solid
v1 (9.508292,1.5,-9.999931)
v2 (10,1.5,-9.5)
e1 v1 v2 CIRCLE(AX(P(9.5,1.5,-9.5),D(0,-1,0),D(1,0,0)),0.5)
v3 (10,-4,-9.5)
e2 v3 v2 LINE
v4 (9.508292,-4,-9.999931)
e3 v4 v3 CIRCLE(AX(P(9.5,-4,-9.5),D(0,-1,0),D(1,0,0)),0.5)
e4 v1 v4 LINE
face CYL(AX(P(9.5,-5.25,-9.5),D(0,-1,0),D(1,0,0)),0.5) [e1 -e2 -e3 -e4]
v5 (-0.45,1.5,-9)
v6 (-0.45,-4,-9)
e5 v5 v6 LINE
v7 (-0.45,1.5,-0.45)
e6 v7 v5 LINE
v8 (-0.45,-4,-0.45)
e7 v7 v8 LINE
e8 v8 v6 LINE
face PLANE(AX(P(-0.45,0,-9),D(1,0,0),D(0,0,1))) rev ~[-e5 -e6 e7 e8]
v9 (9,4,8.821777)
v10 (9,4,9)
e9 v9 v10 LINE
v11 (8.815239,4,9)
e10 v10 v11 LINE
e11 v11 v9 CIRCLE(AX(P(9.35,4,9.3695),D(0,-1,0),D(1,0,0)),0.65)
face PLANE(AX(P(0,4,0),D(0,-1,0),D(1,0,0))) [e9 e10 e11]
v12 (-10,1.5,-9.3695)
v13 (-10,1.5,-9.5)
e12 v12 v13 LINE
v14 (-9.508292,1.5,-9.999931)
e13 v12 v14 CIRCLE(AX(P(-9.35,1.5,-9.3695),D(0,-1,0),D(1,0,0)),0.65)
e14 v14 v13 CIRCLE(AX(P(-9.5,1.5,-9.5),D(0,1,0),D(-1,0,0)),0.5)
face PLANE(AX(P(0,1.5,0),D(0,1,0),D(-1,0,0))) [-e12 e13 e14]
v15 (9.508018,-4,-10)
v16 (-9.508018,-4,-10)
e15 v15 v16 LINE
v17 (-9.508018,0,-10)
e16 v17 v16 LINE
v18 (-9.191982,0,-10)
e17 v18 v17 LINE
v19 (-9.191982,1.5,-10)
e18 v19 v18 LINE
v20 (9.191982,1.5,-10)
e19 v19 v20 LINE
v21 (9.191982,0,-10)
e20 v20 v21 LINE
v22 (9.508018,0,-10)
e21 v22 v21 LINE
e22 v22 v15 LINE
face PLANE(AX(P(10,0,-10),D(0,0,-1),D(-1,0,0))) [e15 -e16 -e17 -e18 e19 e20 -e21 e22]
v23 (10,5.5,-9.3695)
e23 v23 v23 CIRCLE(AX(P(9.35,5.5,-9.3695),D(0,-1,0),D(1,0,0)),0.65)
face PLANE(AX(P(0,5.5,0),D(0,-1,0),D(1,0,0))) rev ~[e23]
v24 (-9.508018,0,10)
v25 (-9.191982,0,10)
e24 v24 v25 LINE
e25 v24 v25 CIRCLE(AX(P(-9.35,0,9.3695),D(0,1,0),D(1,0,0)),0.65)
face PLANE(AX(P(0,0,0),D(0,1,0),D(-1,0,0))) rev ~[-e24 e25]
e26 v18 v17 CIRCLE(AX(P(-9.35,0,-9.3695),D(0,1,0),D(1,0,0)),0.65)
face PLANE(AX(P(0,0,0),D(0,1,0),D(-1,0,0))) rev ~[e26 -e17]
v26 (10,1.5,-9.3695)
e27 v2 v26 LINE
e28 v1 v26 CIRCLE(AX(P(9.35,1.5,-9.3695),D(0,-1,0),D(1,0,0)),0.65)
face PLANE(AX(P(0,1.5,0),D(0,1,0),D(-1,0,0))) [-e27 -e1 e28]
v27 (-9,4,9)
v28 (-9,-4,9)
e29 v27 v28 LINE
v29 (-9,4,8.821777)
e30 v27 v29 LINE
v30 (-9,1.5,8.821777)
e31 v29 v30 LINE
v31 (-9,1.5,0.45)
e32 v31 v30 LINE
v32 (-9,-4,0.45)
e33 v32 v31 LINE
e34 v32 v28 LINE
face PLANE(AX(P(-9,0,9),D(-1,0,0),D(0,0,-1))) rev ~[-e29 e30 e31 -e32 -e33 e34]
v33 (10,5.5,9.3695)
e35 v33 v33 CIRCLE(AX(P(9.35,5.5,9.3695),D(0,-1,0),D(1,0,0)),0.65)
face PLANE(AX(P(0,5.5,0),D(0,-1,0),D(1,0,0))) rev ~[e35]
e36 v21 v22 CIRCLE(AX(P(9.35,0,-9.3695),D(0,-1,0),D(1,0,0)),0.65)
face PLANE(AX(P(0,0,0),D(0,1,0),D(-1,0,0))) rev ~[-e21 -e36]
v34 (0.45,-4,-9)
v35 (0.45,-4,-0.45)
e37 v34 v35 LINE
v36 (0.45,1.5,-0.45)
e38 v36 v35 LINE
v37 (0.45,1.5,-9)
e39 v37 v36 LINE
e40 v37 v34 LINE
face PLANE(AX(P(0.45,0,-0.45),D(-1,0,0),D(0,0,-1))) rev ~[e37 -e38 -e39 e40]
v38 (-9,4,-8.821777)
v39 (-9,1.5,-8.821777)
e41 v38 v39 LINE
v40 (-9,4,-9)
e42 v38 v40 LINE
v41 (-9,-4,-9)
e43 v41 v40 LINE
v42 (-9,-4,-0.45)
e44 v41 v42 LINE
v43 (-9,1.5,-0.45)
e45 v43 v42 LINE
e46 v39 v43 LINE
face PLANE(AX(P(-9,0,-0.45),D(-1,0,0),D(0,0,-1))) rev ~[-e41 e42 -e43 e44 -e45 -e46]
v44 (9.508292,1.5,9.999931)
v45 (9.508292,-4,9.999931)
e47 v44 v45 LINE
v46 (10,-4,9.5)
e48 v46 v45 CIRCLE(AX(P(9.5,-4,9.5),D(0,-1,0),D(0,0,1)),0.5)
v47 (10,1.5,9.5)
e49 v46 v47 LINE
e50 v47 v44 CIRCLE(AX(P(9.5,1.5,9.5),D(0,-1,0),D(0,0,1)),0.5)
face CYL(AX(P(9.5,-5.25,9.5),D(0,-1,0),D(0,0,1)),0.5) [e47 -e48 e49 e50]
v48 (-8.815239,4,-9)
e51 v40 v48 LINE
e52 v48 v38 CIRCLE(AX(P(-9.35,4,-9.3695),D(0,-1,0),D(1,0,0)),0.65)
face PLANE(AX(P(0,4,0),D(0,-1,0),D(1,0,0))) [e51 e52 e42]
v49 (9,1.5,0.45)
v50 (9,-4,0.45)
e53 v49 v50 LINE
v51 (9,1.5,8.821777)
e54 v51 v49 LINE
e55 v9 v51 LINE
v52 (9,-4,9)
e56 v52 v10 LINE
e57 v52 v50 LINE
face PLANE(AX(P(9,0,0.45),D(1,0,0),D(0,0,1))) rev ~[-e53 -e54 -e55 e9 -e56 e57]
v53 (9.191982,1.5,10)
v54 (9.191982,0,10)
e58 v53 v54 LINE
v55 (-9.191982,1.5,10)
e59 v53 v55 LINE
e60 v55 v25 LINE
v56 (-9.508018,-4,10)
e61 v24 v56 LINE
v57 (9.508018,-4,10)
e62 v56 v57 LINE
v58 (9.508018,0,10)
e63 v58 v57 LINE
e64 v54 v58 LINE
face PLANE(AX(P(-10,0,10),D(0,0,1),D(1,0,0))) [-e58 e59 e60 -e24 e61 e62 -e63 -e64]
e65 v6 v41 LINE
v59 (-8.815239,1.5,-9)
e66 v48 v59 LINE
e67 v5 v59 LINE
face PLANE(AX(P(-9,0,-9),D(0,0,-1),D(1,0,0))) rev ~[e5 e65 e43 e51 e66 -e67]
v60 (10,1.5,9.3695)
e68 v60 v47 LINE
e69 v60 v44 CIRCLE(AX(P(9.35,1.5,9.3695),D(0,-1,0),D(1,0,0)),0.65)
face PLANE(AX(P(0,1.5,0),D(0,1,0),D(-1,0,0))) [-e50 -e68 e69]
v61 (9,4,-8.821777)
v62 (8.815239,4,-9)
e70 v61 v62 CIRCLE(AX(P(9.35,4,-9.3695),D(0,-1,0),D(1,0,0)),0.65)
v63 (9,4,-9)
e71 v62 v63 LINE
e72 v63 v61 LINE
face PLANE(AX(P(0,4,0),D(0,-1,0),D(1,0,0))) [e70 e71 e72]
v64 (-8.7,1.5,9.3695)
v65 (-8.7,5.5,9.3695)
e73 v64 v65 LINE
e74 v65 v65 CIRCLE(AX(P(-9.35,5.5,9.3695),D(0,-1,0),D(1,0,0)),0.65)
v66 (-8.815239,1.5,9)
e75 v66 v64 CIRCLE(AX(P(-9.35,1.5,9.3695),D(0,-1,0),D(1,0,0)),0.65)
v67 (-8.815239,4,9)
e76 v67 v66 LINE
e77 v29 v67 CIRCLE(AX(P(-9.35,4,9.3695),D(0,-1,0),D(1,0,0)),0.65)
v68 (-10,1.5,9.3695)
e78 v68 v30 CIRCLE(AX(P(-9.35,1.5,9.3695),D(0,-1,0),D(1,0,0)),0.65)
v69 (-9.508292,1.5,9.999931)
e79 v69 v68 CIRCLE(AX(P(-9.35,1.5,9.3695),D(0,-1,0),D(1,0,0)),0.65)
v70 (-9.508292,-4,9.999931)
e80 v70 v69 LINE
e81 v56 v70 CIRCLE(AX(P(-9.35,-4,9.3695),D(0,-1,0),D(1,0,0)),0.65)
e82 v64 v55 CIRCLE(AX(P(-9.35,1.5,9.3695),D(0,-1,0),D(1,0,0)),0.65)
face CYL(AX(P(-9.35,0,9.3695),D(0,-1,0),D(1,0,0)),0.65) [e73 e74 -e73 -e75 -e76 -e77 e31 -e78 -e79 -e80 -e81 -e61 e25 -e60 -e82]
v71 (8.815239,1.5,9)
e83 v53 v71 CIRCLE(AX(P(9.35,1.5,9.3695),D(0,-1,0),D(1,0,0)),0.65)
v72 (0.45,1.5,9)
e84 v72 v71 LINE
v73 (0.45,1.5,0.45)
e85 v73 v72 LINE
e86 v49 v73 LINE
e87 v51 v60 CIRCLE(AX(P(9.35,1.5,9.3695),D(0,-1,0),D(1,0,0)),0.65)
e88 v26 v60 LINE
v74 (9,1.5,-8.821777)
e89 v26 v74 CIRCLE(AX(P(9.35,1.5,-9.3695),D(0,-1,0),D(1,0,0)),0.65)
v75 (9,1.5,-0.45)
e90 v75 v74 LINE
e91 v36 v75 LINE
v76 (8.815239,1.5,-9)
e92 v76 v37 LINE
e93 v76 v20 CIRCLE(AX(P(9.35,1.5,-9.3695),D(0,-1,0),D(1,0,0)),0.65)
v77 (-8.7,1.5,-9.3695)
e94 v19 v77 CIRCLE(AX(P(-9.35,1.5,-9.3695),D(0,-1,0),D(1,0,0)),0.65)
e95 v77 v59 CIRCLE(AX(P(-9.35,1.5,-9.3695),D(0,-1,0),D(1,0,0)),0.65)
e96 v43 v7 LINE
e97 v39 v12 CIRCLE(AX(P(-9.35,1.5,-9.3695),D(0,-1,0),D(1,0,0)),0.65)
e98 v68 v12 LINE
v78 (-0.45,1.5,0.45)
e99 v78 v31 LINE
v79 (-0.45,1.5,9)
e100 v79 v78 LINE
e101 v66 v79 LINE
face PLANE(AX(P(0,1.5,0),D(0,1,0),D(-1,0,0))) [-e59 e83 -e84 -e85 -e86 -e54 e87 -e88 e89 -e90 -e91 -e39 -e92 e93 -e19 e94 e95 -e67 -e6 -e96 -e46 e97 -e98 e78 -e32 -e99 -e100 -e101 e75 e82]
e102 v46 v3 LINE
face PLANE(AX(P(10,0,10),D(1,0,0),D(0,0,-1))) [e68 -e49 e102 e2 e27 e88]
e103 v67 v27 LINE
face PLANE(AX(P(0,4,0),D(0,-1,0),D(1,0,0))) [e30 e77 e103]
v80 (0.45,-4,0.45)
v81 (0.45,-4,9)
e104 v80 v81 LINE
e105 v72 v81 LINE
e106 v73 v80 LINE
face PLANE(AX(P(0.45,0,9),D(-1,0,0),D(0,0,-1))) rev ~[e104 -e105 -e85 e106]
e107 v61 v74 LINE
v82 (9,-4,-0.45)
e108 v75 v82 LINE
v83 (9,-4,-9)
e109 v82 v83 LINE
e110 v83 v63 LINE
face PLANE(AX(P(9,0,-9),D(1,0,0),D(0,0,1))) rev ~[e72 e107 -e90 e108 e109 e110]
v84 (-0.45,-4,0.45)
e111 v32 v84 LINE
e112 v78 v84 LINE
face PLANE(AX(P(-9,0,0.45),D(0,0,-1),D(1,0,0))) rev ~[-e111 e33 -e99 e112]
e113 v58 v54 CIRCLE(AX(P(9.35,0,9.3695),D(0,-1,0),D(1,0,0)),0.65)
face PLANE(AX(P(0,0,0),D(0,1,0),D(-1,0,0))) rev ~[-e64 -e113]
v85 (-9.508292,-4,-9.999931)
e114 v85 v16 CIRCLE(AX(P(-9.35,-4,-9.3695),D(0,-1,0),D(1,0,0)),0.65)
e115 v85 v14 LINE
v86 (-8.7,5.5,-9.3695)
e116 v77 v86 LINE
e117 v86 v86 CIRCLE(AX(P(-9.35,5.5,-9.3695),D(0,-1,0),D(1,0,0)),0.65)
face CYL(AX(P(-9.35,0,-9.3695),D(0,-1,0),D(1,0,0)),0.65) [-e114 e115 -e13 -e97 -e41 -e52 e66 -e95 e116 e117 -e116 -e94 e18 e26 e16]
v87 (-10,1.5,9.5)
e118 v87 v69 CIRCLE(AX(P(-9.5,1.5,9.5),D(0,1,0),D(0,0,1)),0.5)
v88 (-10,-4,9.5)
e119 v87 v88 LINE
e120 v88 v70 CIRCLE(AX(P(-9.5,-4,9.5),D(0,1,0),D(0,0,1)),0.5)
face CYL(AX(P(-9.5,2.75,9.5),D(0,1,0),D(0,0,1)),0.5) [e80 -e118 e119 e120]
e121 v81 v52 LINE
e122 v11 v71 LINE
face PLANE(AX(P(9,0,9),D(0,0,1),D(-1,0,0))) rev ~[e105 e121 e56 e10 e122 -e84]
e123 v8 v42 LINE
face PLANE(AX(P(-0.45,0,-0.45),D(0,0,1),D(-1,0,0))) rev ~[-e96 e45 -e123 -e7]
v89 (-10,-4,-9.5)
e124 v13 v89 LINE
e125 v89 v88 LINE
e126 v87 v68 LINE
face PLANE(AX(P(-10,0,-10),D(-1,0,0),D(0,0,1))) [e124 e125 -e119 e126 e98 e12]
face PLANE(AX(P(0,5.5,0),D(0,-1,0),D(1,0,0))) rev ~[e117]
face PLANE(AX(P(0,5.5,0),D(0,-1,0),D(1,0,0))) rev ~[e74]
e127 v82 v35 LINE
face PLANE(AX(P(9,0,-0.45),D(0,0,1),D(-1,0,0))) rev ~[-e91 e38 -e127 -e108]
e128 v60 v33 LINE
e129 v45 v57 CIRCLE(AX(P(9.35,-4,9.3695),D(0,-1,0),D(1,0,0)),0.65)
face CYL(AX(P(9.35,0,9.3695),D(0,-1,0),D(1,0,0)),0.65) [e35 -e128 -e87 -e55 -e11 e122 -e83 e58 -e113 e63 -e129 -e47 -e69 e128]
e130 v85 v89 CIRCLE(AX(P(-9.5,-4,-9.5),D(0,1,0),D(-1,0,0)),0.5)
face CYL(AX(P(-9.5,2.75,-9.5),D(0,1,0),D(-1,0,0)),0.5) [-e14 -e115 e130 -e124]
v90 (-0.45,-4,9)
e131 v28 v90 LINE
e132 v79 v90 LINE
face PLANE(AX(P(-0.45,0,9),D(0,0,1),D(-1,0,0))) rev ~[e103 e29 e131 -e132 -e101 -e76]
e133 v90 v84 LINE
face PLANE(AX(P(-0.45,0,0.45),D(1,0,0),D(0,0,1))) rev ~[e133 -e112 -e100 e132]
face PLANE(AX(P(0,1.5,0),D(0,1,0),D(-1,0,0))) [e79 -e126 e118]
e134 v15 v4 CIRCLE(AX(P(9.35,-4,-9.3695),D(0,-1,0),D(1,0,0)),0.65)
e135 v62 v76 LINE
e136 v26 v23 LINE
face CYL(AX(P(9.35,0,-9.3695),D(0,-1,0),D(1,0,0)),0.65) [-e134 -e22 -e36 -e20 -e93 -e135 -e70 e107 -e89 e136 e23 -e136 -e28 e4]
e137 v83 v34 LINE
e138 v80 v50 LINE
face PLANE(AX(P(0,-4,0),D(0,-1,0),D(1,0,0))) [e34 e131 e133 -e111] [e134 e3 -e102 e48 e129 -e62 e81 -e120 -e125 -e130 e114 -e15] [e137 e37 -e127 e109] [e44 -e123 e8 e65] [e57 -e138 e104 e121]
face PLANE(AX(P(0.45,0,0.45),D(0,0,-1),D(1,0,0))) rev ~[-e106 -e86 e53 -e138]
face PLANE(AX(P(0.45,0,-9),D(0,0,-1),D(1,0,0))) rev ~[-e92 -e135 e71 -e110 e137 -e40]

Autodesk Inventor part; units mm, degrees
ref_plane "YZ Plane" through (0, 0, 0) normal (1, 0, 0) x (0, 1, 0)
ref_plane "XZ Plane" through (0, 0, 0) normal (0, 1, 0) x (-1, 0, 0)
ref_plane "XY Plane" through (0, 0, 0) normal (0, 0, 1) x (1, 0, 0)
sketch "Sketch1" plane through (0, 0, 0) normal (0, 1, 0) x (-1, 0, 0)
  line L0 (-9.35, 9.3695) -> (9.35, 9.3695) construction
  line L1 (9.35, 9.3695) -> (9.35, -9.3695) construction
  line L2 (9.35, -9.3695) -> (-9.35, -9.3695) construction
  line L3 (-9.35, -9.3695) -> (-9.35, 9.3695) construction
  line L4 (-9.35, 9.3695) -> (9.35, -9.3695) construction
  line L5 (9.35, 9.3695) -> (-9.35, -9.3695) construction
  line L6 (-10, 10) -> (10, 10)
  line L7 (10, 10) -> (10, -10)
  line L8 (10, -10) -> (-10, -10)
  line L9 (-10, -10) -> (-10, 10)
  line L10 (-10, 10) -> (10, -10) construction
  line L11 (10, 10) -> (-10, -10) construction
  point P0 (0, 0)
  dimension "d0" = 18.739
  dimension "d1" = 18.7
  dimension "d2" = 20
  dimension "d3" = 20
extrude "Extrusion1" add sketch "Sketch1" along normal blind 1.5
sketch "Sketch2" plane through (0, 0, 0) normal (0, -1, 0) x (1, 0, 0)
  line L0 (-9.35, 9.3695) -> (9.35, 9.3695) construction
  line L1 (9.35, 9.3695) -> (9.35, -9.3695) construction
  line L2 (9.35, -9.3695) -> (-9.35, -9.3695) construction
  line L3 (-9.35, -9.3695) -> (-9.35, 9.3695) construction
  line L4 (-9.35, 9.3695) -> (9.35, -9.3695) construction
  line L5 (9.35, 9.3695) -> (-9.35, -9.3695) construction
  circle A0 centre (9.35, 9.3695) radius 0.65
  circle A1 centre (-9.35, 9.3695) radius 0.65
  line L6 (-10, -10) -> (-10, 10) projected
  circle A2 centre (9.35, -9.3695) radius 0.65
  circle A3 centre (-9.35, -9.3695) radius 0.65
  point P0 (0, 0)
  dimension "d6" = 1.3
  dimension "d7" = 18.739
  dimension "d8" = 18.7
  dimension "d9" = 1.3
  dimension "d11" = 1.3
  dimension "d12" = 1.3
extrude "Extrusion2" add sketch "Sketch2" against normal blind 5.5
sketch "Sketch3" plane through (0, 0, 0) normal (0, -1, 0) x (1, 0, 0)
  line L0 (-10, 10) -> (10, 10) projected
  line L1 (10, -10) -> (-10, -10)
  line L2 (-10, -10) -> (-10, 10)
  line L3 (-10, 10) -> (10, 10)
  line L4 (10, 10) -> (10, -10)
  line L5 (10, -10) -> (-10, 10) construction
  line L6 (-10, -10) -> (10, 10) construction
  line L7 (9, -9) -> (-9, -9)
  line L8 (-9, -9) -> (-9, 9)
  line L9 (-9, 9) -> (9, 9)
  line L10 (9, 9) -> (9, -9)
  line L11 (9, -9) -> (-9, 9) construction
  line L12 (-9, -9) -> (9, 9) construction
  point P0 (0, 0)
  dimension "d15" = 1
  dimension "d16" = 1
extrude "Extrusion3" add sketch "Sketch3" along normal blind 4
sketch "Sketch4" plane through (0, 0, 0) normal (0, -1, 0) x (1, 0, 0)
  line L0 (-9, 9) -> (-9, -9) projected
  line L1 (9, -0.45) -> (-9, -0.45)
  line L2 (-9, -0.45) -> (-9, 0.45)
  line L3 (-9, 0.45) -> (9, 0.45)
  line L4 (9, 0.45) -> (9, -0.45)
  line L5 (9, -0.45) -> (-9, 0.45) construction
  line L6 (-9, -0.45) -> (9, 0.45) construction
  line L7 (-9, -9) -> (9, -9) projected
  line L8 (0.45, 9) -> (-0.45, 9)
  line L9 (-0.45, 9) -> (-0.45, -9)
  line L10 (-0.45, -9) -> (0.45, -9)
  line L11 (0.45, -9) -> (0.45, 9)
  line L12 (0.45, 9) -> (-0.45, -9) construction
  line L13 (-0.45, 9) -> (0.45, -9) construction
  point P0 (0, 0)
  point P1 (-9, 8.8822)
  point P2 (-9, -8.8822)
  point P3 (-8.8773, -9)
  point P4 (8.8773, -9)
  point P5 (0.45, -0.45)
  point P6 (0.45, 0.45)
  point P7 (-0.45, 0.45)
  point P8 (-0.45, -0.45)
  dimension "d19" = 0.9
  dimension "d20" = 0.9
extrude "Extrusion4" add sketch "Sketch4" along normal blind 4 contours L3 L9 L1 L0 | L9 L8 L11 L3 | L3 L11 L1 L9 | L1 L11 L7 L9 | L3 L4 L1 L11
fillet "Fillet1" radius 0.5 4 edges at (10, -1.25, 10) (-10, -1.25, 10) (10, -1.25, -10) (-10, -1.25, -10)
sketch "Sketch5" plane through (0, 0, 0) normal (0, -1, 0) x (1, 0, 0)
  line L0 (-9, -9) -> (-0.45, -9) projected
  line L1 (-0.45, -9) -> (-0.45, -0.45) projected
  line L2 (-9, -9) -> (-0.45, -9)
  line L3 (-0.45, -9) -> (-0.45, -0.45)
  line L4 (-0.45, -0.45) -> (-9, -0.45)
  line L5 (-9, -0.45) -> (-9, -9)
  line L6 (-9, 0.45) -> (-0.45, 0.45) projected
  line L7 (-0.45, 9) -> (-9, 9) projected
  line L8 (-9, 0.45) -> (-0.45, 0.45)
  line L9 (-0.45, 0.45) -> (-0.45, 9)
  line L10 (-0.45, 9) -> (-9, 9)
  line L11 (-9, 9) -> (-9, 0.45)
  line L12 (0.45, -9) -> (9, -9) projected
  line L13 (9, -9) -> (9, -0.45) projected
  line L14 (0.45, -9) -> (9, -9)
  line L15 (9, -9) -> (9, -0.45)
  line L16 (9, -0.45) -> (0.45, -0.45)
  line L17 (0.45, -0.45) -> (0.45, -9)
  line L18 (0.45, 0.45) -> (9, 0.45) projected
  line L19 (9, 0.45) -> (9, 9) projected
  line L20 (0.45, 0.45) -> (9, 0.45)
  line L21 (9, 0.45) -> (9, 9)
  line L22 (9, 9) -> (0.45, 9)
  line L23 (0.45, 9) -> (0.45, 0.45)
  point P0 (0, 0)
  point P1 (-0.45, 0.45)
extrude "Extrusion5" cut sketch "Sketch5" against normal blind 4
properties part number "skirt"
